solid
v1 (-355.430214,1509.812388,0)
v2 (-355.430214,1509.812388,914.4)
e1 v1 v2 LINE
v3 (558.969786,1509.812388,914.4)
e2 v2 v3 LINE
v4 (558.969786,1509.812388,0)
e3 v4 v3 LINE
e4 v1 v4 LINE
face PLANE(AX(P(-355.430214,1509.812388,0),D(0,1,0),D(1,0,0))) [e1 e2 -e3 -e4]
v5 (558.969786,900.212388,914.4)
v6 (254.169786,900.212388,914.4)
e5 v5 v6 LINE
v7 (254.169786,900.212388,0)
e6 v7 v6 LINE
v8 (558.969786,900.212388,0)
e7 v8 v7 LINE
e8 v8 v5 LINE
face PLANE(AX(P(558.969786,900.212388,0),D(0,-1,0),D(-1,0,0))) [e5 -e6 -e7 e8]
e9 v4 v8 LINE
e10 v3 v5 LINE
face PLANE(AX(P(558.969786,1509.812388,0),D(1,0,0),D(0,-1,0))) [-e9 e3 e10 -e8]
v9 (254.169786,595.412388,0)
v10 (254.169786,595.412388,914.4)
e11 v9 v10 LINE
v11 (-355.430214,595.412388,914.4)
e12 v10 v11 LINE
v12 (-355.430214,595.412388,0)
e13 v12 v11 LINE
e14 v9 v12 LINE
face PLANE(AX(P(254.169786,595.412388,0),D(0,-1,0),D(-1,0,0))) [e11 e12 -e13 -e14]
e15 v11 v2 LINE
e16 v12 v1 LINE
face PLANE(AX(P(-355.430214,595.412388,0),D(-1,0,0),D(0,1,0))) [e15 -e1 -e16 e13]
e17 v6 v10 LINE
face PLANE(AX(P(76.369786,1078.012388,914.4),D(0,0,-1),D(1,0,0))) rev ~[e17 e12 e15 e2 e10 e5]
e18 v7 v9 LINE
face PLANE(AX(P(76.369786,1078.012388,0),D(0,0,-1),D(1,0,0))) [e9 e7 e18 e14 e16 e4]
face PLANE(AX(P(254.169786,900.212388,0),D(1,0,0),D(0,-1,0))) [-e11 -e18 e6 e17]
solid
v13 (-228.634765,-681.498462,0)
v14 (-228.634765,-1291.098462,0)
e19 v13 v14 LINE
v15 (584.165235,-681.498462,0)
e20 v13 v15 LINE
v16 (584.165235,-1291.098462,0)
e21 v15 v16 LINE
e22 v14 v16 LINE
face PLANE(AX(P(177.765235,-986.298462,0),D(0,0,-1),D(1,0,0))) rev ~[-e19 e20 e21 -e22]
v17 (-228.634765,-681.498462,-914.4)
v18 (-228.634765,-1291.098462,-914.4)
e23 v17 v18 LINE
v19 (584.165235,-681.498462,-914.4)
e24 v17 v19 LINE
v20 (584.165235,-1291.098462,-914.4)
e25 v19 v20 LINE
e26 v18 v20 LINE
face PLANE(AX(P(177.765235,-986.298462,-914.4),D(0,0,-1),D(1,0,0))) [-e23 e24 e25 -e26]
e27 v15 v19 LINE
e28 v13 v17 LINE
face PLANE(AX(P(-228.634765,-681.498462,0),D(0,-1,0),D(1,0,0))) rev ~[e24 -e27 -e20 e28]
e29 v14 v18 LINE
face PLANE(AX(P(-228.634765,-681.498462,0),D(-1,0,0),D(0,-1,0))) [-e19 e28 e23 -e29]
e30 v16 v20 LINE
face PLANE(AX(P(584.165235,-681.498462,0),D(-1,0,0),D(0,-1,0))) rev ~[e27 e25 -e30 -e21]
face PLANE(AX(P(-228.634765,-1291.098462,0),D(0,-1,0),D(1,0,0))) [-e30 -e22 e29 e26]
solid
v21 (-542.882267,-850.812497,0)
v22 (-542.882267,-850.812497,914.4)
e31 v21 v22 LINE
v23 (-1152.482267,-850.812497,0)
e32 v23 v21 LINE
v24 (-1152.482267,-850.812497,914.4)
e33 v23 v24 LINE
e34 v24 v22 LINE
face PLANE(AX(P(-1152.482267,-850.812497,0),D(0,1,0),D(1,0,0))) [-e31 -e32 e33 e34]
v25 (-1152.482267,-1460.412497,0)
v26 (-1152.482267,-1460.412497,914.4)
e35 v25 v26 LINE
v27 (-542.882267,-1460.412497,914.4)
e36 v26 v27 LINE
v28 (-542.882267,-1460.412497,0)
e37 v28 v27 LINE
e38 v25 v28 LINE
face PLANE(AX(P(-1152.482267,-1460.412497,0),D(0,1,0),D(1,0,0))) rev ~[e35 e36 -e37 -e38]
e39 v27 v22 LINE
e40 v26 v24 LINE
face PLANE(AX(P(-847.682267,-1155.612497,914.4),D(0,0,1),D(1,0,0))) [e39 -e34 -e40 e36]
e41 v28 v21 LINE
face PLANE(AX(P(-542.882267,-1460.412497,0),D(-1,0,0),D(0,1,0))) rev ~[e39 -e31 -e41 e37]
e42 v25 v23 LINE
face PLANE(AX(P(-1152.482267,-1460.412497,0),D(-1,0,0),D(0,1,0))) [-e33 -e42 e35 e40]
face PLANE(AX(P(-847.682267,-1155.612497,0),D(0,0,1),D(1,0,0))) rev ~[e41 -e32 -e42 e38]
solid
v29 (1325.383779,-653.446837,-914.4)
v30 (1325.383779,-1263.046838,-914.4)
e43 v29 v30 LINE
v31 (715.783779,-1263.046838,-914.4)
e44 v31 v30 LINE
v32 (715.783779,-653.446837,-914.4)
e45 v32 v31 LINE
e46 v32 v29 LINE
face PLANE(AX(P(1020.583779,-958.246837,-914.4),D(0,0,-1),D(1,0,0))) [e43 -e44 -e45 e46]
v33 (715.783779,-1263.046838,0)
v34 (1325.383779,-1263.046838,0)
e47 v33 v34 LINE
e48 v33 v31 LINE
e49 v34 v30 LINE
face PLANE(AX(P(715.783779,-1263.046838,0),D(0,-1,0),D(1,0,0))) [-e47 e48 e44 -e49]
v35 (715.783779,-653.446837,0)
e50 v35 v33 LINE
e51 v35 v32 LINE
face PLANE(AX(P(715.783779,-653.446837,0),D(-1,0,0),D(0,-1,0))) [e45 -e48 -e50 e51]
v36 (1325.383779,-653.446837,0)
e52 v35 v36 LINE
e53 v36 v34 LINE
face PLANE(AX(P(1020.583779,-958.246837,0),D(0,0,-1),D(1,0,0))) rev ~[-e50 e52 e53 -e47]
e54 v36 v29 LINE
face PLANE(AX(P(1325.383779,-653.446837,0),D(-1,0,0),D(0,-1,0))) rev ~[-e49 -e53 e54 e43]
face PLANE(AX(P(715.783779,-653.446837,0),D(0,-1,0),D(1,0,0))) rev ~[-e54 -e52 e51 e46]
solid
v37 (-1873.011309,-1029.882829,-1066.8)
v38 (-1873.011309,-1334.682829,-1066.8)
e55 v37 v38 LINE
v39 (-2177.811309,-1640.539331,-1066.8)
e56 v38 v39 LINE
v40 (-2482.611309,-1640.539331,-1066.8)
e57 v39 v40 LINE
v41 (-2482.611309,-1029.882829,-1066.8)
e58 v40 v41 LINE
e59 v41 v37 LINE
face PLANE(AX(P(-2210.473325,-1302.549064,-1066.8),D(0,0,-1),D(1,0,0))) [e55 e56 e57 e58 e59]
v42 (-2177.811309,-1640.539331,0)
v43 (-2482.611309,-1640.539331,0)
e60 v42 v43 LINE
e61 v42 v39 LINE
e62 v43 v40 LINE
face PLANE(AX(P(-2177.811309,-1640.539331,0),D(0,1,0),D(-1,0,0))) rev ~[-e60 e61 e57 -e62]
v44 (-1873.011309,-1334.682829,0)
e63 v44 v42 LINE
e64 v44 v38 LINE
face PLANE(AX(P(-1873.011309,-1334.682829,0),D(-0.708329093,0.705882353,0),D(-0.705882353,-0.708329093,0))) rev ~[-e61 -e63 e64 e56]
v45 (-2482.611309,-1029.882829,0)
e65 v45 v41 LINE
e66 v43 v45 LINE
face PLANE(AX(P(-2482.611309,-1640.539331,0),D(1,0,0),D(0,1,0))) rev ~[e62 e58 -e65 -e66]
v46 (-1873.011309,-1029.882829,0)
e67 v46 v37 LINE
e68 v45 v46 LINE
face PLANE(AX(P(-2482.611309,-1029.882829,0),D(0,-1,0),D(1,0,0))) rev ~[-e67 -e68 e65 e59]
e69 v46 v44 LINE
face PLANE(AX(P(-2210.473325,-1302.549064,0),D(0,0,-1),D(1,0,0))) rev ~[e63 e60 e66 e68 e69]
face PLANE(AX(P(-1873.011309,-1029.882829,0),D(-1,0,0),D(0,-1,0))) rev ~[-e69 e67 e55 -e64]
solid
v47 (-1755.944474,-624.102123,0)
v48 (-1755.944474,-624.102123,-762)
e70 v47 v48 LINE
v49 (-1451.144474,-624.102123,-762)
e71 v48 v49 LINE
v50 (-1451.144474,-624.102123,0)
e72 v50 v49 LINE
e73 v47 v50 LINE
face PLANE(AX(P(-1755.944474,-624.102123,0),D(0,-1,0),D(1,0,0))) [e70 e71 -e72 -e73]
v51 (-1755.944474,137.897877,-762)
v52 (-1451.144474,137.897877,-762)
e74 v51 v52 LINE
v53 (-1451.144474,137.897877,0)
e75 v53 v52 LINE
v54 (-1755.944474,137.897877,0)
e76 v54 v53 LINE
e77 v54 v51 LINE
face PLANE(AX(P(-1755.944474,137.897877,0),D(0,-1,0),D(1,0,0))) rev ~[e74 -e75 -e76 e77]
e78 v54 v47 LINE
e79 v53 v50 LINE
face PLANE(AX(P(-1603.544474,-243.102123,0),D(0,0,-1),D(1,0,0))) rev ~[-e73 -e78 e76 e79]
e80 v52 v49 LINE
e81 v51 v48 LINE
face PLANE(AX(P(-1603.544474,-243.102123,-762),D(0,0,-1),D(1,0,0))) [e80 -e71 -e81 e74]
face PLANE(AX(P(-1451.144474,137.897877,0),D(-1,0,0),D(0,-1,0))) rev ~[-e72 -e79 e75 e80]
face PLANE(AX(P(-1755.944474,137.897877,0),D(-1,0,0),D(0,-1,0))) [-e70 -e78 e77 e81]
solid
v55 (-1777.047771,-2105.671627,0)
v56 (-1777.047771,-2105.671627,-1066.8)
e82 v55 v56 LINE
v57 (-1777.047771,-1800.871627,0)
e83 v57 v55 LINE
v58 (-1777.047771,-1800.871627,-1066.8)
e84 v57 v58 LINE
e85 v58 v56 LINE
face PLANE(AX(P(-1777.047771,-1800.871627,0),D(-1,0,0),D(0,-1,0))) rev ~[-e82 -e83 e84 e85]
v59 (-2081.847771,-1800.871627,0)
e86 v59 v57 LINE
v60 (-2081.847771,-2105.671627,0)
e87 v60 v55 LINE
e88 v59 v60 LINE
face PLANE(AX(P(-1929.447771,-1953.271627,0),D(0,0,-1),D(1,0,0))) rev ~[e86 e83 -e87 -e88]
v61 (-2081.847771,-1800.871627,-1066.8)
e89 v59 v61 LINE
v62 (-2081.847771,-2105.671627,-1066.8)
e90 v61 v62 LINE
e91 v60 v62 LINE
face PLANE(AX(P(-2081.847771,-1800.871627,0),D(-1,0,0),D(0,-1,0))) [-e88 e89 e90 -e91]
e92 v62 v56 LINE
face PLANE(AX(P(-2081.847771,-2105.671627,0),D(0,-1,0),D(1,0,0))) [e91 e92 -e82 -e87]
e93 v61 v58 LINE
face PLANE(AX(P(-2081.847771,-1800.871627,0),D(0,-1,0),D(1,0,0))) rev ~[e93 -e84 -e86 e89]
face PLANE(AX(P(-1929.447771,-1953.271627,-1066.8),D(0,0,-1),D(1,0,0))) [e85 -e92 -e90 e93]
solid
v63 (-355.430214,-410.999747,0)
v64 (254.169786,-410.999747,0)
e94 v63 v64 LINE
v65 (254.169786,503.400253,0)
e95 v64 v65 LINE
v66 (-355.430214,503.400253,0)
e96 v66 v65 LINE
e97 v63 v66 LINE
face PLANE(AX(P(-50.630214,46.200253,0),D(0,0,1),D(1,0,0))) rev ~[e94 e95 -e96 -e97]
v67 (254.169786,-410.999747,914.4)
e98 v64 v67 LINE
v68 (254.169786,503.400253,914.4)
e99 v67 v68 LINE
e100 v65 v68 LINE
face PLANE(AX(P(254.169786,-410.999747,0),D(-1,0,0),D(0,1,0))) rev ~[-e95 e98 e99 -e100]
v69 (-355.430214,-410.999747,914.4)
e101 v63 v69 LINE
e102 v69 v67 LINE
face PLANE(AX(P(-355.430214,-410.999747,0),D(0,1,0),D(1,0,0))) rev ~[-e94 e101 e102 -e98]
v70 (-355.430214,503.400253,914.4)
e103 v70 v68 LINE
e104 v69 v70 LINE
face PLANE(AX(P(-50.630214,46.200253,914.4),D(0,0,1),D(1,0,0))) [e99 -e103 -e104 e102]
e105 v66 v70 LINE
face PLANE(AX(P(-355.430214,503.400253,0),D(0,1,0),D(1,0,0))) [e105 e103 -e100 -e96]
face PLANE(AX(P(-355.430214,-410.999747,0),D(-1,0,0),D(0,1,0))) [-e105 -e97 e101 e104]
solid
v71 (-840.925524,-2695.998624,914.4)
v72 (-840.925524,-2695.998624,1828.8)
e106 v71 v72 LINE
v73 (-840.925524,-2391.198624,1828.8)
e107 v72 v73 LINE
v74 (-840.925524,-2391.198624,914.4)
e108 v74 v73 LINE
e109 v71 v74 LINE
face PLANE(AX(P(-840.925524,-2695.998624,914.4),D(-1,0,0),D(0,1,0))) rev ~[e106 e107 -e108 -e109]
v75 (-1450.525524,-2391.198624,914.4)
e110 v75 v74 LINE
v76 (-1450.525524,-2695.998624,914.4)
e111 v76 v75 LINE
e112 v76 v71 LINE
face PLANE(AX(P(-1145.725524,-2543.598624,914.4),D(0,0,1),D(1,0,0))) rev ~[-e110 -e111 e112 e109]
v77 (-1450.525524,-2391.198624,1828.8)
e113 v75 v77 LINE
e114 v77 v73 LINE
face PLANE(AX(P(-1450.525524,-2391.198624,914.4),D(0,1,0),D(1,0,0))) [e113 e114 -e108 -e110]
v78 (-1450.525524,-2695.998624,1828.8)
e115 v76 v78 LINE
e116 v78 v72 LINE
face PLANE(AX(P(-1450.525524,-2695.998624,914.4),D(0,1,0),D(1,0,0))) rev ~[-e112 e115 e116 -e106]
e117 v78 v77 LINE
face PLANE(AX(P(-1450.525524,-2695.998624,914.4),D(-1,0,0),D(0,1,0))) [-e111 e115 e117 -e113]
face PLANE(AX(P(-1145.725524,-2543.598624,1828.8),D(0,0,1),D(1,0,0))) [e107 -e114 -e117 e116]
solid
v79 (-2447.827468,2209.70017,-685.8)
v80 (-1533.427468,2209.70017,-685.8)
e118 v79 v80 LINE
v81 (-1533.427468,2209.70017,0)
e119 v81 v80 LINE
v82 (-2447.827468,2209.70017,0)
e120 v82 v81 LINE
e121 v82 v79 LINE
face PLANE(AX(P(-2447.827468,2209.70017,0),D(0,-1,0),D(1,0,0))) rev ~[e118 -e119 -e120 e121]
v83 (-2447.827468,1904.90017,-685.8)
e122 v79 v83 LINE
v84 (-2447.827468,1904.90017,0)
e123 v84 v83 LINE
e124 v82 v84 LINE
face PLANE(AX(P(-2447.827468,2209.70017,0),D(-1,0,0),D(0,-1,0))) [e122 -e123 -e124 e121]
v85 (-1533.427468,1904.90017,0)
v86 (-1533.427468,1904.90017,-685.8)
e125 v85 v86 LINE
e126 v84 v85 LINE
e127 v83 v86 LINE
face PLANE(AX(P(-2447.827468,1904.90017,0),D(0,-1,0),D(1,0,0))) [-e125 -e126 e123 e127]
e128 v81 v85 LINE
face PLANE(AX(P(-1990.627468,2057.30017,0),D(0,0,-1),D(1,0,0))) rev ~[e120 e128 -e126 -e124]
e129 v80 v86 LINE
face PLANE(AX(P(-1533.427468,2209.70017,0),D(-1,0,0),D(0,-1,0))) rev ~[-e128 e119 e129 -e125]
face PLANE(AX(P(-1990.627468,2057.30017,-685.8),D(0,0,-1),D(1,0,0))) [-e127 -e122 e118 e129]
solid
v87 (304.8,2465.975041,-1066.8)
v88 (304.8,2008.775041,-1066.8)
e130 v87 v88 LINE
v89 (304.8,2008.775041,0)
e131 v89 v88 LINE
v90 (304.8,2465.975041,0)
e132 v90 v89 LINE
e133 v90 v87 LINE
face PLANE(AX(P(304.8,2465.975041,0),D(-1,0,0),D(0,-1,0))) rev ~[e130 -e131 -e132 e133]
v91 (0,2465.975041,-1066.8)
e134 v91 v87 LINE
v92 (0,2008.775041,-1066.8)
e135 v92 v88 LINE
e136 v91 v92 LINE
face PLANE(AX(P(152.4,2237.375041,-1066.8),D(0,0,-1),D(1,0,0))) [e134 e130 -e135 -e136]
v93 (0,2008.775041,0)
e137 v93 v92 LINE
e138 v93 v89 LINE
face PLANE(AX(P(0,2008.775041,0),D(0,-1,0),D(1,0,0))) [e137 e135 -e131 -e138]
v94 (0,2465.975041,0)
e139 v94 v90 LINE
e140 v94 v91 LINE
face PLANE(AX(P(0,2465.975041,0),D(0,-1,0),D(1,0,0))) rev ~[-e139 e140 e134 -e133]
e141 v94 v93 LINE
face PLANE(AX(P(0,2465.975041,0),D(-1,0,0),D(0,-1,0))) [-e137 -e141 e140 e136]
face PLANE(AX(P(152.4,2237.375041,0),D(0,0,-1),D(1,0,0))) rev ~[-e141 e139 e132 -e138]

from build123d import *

# Parameters (mm, degrees)
F0_W      = 609.6
F0_H      = 914.4
F1_DEPTH  = 914.4
F3_DEPTH  = 914.4
F4_W      = 609.6
F4_H      = 609.6
F5_DEPTH  = 914.4
F6_W      = 812.8
F6_H      = 609.6
F7_DEPTH  = 914.4
F8_W      = 609.6
F8_H      = 609.6
F9_DEPTH  = 914.4
F10_W     = 609.6
F10_H     = 304.8
F11_DEPTH = 914.4
F13_DEPTH = 1066.8
F14_W     = 304.8
F14_H     = 304.8
F15_DEPTH = 1066.8
F16_W     = 304.8
F16_H     = 762
F17_DEPTH = 762
F18_W     = 914.4
F18_H     = 304.8
F19_DEPTH = 685.8
F20_W     = 304.8
F20_H     = 457.2
F21_DEPTH = 1066.8


# Not quite as in the source:
# - a feature names something its author has since deleted; it is built from what else it names


with BuildPart() as f1:
    # F0 (on Top) → F1 (new body)
    with BuildSketch(Plane.XY):
        with Locations((-50.6302136928, 46.2002533887)):
            Rectangle(F0_W, F0_H)
    extrude(amount=F1_DEPTH)


with BuildPart() as f3:
    # F2 (on face) → F3 (new body)
    with BuildSketch(Plane(origin=(0, 0, 0), x_dir=(1, 0, 0), z_dir=(0, 0, -1))):
        Polygon((254.1697863072, -900.2123884309), (254.1697863072, -595.4123884309), (-355.4302136928, -595.4123884309), (-355.4302136928, -1509.8123884309), (558.9697863072, -1509.8123884309), (558.9697863072, -900.2123884309), align=None)
    extrude(amount=-F3_DEPTH)


with BuildPart() as f5:
    # F4 (on face) → F5 (new body)
    with BuildSketch(Plane(origin=(0, 0, 0), x_dir=(1, 0, 0), z_dir=(0, 0, -1))):
        with Locations((1020.5837786198, 958.2468374996)):
            Rectangle(F4_W, F4_H)
    extrude(amount=F5_DEPTH)


with BuildPart() as f7:
    # F6 (on face) → F7 (new body)
    with BuildSketch(Plane(origin=(0, 0, 0), x_dir=(1, 0, 0), z_dir=(0, 0, -1))):
        with Locations((177.7652353048, 986.2984619199)):
            Rectangle(F6_W, F6_H)
    extrude(amount=F7_DEPTH)


with BuildPart() as f9:
    # F8 (on face) → F9 (new body)
    with BuildSketch(Plane.XY):
        with Locations((-847.6822674274, -1155.6124973011)):
            Rectangle(F8_W, F8_H)
    extrude(amount=F9_DEPTH)


with BuildPart() as f11:
    # F10 (on face) → F11 (new body)
    with BuildSketch(Plane.XY.offset(914.4)):
        with Locations((-1145.7255238362, -2543.5986241634)):
            Rectangle(F10_W, F10_H)
    extrude(amount=F11_DEPTH)


with BuildPart() as f13:
    # F12 (on face) → F13 (new body)
    with BuildSketch(Plane(origin=(0, 0, 0), x_dir=(1, 0, 0), z_dir=(0, 0, -1))):
        Polygon((-2482.6113088184, 1029.8828289854), (-1873.0113088184, 1029.8828289854), (-1873.0113088184, 1334.6828289854), (-2177.8113088184, 1640.5393312868), (-2482.6113088184, 1640.5393312868), align=None)
    extrude(amount=F13_DEPTH)


with BuildPart() as f15:
    # F14 (on face) → F15 (new body)
    with BuildSketch(Plane(origin=(0, 0, 0), x_dir=(1, 0, 0), z_dir=(0, 0, -1))):
        with Locations((-1929.4477705223, 1953.2716274261)):
            Rectangle(F14_W, F14_H)
    extrude(amount=F15_DEPTH)


with BuildPart() as f17:
    # F16 (on face) → F17 (new body)
    with BuildSketch(Plane(origin=(0, 0, 0), x_dir=(1, 0, 0), z_dir=(0, 0, -1))):
        with Locations((-1603.5444736481, 243.1021227015)):
            Rectangle(F16_W, F16_H)
    extrude(amount=F17_DEPTH)


with BuildPart() as f19:
    # F18 (on face) → F19 (new body)
    with BuildSketch(Plane(origin=(0, 0, 0), x_dir=(1, 0, 0), z_dir=(0, 0, -1))):
        with Locations((-1990.6274676323, -2057.3001701469)):
            Rectangle(F18_W, F18_H)
    extrude(amount=F19_DEPTH)


with BuildPart() as f21:
    # F20 (on face) → F21 (new body)
    with BuildSketch(Plane(origin=(0, 0, 0), x_dir=(1, 0, 0), z_dir=(0, 0, -1))):
        with Locations((152.4, -2237.3750410851)):
            Rectangle(F20_W, F20_H)
    extrude(amount=F21_DEPTH)


solid = Compound([f1.part, f3.part, f5.part, f7.part, f9.part, f11.part, f13.part, f15.part, f17.part, f19.part, f21.part])
